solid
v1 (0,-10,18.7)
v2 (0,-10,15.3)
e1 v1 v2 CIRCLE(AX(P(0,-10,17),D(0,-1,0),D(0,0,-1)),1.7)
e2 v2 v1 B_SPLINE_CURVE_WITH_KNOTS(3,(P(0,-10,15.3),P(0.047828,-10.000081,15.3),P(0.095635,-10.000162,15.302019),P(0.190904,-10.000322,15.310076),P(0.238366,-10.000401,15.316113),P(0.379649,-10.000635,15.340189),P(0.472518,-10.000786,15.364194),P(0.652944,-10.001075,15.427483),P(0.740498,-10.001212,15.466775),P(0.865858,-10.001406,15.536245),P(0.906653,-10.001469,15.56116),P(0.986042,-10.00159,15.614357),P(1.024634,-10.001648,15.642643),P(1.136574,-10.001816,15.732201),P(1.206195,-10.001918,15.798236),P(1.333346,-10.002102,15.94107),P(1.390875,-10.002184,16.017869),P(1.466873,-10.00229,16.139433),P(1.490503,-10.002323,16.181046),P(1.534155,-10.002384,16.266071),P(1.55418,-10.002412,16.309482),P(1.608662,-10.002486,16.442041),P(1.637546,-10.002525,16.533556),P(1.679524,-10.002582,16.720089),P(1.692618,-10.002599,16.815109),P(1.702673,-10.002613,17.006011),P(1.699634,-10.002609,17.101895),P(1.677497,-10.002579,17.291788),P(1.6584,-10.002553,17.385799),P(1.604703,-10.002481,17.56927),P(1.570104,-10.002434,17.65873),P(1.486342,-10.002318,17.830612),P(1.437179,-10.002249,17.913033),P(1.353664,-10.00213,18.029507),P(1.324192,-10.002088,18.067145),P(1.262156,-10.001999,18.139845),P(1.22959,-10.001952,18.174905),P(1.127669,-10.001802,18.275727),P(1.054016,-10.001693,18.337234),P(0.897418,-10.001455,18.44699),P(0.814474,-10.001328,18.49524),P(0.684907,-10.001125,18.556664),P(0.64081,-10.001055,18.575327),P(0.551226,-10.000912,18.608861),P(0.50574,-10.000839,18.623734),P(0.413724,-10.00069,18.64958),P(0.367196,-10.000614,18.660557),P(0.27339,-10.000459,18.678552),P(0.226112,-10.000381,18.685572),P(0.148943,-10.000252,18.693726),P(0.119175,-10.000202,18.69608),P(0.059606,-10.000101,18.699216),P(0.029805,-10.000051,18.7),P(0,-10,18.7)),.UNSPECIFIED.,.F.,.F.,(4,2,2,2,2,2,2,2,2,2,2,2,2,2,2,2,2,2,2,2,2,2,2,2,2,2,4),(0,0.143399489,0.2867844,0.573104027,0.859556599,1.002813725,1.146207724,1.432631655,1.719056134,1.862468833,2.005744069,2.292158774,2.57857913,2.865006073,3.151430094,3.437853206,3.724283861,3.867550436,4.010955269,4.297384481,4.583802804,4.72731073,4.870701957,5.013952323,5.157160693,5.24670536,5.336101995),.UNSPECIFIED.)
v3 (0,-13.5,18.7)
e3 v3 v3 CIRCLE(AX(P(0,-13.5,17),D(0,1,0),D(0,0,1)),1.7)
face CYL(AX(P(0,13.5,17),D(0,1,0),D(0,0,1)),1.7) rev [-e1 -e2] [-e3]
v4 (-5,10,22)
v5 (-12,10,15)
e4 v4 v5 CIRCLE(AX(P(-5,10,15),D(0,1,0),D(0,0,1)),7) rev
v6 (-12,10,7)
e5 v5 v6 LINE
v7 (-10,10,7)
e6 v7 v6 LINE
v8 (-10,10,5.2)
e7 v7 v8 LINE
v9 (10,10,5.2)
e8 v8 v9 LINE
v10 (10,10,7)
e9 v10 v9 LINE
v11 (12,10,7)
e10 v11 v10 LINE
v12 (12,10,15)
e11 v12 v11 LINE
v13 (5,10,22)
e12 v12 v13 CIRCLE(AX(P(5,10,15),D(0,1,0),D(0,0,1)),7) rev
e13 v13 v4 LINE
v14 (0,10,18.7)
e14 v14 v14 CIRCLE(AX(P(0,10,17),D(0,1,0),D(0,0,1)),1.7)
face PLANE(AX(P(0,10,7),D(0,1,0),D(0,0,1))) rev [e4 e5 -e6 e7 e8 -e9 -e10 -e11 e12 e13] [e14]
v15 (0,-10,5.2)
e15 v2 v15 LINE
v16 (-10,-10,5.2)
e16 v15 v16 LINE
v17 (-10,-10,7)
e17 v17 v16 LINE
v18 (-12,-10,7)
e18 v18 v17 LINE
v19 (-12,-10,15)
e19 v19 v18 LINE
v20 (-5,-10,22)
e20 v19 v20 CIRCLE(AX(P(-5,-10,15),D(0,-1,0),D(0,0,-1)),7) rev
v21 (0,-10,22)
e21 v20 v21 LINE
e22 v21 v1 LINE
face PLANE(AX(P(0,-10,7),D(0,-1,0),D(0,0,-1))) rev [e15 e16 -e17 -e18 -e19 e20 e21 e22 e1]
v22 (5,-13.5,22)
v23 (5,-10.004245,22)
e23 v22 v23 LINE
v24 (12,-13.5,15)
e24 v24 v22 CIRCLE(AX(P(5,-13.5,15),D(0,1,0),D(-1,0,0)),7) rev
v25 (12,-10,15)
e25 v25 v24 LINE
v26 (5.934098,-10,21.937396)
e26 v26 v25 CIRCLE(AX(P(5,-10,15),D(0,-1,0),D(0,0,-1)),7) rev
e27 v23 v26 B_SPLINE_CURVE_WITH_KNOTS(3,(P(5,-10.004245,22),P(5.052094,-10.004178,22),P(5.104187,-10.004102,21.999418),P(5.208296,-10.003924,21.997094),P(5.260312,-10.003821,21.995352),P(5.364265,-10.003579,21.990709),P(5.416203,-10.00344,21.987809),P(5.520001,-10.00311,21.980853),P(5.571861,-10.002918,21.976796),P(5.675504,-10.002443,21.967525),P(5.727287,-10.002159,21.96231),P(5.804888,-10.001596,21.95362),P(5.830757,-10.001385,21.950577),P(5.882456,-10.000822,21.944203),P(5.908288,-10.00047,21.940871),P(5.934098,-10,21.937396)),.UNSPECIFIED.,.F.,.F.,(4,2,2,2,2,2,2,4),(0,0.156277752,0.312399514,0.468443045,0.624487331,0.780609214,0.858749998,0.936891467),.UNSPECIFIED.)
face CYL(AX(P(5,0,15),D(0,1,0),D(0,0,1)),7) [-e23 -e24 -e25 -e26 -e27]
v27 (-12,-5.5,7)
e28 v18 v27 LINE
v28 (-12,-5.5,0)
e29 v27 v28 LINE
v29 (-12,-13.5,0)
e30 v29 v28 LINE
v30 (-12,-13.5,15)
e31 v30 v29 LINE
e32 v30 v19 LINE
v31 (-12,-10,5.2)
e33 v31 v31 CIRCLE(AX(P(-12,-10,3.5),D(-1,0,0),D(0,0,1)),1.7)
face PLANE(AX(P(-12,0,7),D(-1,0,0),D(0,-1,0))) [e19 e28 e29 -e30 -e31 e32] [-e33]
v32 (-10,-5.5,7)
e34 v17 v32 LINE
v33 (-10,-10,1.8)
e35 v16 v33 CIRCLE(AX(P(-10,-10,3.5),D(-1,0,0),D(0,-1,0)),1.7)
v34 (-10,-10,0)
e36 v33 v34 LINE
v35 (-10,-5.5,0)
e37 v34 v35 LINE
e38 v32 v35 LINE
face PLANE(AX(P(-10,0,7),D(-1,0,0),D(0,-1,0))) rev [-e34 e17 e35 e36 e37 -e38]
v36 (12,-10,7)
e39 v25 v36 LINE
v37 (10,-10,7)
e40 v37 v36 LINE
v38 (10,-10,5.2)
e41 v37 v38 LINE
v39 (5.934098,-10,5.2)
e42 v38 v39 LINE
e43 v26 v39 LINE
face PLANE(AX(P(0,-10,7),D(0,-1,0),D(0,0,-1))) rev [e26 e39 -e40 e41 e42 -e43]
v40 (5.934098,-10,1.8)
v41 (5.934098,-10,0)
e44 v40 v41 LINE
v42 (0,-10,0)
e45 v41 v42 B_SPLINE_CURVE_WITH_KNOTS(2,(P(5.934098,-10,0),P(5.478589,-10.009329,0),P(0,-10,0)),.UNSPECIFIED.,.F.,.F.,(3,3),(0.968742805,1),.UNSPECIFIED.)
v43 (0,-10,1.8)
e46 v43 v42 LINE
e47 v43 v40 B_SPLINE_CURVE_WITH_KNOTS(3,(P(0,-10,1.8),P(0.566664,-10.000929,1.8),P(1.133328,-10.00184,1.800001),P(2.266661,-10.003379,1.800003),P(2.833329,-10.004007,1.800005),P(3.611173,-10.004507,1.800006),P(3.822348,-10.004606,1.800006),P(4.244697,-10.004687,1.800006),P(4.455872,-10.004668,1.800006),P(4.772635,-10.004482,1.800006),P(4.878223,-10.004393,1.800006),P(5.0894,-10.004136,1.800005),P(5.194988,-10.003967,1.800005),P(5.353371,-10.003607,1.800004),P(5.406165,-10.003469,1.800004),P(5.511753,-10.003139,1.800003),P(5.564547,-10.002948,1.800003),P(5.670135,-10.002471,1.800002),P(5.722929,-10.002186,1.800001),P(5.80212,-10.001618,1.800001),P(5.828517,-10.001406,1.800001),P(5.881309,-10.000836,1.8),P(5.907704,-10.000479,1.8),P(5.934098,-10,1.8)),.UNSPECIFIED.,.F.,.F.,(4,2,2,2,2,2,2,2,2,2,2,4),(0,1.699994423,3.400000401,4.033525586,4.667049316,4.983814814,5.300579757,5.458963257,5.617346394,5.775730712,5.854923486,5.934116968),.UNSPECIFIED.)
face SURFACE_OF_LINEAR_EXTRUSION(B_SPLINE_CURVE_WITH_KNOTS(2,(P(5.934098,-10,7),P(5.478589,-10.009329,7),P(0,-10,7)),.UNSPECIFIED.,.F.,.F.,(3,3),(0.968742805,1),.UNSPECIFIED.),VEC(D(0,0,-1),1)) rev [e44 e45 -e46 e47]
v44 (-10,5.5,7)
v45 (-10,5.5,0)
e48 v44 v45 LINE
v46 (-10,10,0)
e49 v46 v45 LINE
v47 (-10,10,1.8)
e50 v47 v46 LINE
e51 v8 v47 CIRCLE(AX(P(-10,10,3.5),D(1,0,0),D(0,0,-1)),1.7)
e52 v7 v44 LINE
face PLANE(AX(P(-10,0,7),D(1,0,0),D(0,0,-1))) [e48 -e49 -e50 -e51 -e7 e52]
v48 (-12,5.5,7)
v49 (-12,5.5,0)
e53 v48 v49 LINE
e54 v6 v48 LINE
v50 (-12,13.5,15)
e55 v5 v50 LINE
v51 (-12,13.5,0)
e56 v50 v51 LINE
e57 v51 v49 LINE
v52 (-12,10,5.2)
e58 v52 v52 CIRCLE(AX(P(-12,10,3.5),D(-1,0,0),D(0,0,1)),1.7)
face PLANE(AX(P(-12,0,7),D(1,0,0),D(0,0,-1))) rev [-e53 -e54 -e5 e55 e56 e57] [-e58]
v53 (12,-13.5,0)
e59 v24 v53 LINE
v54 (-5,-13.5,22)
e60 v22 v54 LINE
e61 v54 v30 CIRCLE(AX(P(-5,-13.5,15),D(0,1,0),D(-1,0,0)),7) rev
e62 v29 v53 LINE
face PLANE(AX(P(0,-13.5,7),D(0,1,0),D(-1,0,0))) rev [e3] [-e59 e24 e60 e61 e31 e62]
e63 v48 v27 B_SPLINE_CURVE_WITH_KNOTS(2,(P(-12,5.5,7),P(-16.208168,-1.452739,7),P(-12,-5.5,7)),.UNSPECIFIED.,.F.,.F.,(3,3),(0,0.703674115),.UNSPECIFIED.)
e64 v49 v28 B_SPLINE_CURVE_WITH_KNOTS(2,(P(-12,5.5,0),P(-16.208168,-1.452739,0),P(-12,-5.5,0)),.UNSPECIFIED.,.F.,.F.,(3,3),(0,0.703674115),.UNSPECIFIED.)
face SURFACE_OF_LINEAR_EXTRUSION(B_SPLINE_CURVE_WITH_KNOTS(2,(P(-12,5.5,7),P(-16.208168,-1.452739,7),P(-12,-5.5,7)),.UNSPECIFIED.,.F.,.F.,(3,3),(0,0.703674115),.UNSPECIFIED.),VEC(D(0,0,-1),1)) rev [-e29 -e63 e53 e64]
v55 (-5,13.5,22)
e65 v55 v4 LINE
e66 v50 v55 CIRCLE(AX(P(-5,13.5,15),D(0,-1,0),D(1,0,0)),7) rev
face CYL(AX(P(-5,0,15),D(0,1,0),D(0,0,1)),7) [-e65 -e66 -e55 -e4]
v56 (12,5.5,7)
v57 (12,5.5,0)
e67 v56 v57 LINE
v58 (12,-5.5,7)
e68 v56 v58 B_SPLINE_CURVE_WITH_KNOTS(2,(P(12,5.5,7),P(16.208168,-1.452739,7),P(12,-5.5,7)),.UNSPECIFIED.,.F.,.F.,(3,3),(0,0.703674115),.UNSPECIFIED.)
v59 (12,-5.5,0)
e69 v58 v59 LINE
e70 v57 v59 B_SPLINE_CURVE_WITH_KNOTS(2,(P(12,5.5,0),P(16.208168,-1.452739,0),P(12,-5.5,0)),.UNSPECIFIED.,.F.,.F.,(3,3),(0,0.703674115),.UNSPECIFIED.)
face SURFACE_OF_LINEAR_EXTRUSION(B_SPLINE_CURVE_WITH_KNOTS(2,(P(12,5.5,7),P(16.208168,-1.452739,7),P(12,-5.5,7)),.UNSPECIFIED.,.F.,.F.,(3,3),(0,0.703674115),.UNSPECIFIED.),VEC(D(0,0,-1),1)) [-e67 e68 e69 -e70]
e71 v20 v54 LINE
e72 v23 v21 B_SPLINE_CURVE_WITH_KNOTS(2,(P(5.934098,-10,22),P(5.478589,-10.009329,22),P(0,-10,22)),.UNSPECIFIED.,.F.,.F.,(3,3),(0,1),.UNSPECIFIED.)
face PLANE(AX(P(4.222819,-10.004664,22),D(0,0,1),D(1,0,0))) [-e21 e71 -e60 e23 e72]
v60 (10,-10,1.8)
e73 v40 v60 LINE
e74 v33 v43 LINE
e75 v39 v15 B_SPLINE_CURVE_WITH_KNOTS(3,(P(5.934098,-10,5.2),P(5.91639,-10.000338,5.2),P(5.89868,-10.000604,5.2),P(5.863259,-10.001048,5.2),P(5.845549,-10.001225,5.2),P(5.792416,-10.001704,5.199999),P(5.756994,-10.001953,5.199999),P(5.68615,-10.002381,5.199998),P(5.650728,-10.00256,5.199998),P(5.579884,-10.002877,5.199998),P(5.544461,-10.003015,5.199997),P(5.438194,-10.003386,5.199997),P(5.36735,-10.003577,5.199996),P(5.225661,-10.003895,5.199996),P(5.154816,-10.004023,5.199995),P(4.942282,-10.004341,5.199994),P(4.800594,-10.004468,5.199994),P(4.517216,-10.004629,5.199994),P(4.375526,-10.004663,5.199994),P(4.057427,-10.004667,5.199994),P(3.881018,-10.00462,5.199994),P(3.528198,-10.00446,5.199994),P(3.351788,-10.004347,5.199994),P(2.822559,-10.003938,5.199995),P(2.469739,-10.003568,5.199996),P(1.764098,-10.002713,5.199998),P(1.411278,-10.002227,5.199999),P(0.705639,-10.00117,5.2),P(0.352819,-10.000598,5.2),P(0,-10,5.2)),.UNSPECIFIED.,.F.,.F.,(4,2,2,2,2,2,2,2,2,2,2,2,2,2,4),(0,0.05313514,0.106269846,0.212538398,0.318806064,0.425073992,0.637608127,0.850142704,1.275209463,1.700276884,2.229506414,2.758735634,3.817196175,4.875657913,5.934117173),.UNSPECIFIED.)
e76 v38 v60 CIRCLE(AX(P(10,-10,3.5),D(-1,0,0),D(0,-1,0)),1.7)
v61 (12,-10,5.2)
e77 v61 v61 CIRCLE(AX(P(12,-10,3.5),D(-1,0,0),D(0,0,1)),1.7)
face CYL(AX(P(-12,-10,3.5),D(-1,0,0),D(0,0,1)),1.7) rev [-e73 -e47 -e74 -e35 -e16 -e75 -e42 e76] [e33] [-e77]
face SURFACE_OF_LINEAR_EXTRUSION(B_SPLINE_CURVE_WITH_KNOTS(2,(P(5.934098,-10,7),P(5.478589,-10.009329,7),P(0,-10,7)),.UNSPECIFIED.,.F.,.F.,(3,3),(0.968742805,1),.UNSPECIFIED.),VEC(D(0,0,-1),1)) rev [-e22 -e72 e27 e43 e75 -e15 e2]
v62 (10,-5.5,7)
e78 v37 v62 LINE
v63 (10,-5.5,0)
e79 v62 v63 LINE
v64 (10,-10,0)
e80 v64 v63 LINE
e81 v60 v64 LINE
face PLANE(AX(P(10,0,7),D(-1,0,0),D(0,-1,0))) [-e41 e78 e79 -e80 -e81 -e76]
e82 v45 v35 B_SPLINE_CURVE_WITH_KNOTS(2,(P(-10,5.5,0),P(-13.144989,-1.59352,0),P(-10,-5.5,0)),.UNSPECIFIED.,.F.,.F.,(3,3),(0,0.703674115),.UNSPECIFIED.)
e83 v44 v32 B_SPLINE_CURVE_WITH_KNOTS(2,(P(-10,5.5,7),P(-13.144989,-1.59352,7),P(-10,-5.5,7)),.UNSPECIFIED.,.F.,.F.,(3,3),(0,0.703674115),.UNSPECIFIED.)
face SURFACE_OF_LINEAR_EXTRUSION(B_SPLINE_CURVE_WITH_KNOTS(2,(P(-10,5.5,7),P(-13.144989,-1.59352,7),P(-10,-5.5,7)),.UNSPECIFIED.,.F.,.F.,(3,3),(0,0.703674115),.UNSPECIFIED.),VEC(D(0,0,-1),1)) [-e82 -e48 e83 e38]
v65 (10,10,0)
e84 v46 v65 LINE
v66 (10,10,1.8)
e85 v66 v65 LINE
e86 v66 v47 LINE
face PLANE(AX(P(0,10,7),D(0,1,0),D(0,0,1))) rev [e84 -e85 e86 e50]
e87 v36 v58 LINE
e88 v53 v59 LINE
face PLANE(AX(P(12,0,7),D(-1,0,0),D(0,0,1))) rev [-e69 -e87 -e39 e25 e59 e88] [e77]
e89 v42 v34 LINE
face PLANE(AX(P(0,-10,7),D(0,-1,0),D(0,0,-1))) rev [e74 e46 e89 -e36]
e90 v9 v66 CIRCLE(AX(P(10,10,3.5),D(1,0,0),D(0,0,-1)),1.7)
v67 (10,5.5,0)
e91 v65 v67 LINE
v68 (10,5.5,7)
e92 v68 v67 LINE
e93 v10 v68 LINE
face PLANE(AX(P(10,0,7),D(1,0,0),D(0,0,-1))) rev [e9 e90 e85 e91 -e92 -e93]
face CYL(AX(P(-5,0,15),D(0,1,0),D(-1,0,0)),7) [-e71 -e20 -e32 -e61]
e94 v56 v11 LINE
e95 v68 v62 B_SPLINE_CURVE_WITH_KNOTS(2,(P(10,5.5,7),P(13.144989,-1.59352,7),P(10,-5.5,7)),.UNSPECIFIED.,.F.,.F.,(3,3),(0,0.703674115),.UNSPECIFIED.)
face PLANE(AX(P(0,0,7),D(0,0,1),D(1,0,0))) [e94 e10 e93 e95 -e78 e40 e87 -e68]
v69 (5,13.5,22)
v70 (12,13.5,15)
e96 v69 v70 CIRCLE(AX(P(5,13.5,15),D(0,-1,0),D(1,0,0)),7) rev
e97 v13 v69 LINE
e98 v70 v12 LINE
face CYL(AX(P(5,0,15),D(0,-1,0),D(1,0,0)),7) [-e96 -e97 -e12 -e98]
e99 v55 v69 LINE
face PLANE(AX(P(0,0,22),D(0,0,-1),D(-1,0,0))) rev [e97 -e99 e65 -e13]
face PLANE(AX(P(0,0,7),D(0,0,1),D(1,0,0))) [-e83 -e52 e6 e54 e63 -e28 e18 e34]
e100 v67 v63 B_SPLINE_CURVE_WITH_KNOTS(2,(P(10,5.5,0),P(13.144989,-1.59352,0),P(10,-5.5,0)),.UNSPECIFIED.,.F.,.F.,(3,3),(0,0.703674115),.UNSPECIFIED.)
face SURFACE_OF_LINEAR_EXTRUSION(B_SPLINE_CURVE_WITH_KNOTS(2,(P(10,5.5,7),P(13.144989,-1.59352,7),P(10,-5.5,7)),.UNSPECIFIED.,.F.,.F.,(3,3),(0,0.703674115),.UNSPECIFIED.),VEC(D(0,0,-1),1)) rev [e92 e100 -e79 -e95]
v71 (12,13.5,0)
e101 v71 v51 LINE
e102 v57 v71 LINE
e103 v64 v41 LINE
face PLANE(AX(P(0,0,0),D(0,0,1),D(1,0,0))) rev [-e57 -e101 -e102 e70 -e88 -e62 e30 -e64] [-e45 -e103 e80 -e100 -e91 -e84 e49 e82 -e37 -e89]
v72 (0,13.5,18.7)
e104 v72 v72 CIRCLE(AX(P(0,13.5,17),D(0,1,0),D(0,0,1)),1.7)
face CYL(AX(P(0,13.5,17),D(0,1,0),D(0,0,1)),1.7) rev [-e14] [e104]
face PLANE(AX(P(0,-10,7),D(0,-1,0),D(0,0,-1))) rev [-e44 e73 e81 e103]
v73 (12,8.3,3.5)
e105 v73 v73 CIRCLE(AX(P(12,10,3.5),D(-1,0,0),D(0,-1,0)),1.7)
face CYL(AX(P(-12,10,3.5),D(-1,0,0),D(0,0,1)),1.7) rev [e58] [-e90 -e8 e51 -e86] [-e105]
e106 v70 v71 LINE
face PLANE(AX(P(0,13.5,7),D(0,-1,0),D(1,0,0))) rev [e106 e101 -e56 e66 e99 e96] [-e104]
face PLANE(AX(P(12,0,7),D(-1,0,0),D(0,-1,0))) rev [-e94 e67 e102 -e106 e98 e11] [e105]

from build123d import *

# Parameters (mm, degrees)
SKETCH1_W               = 24
SKETCH1_H               = 3.5
BOSS_EXTRUDE1_DEPTH     = 7
BOSS_EXTRUDE2_START     = 7
BOSS_EXTRUDE2_OUTLINE_W = 24
BOSS_EXTRUDE2_OUTLINE_H = 3.5
BOSS_EXTRUDE2_DEPTH     = 15
FILLET1_R               = 7
M3_CLEARANCE_HOLE1_D    = 3.4
M3_CLEARANCE_HOLE2_D    = 3.4


# Read off the part's stored shape, not the designer's step: Boss-Extrude2
with BuildPart() as part:
    # Sketch1 → Boss-Extrude1 (new body)
    with BuildSketch(Plane.XY):
        with Locations((0, 11.75)):
            Rectangle(SKETCH1_W, SKETCH1_H)
        with BuildLine():
            Line((-10, 10), (-12, 10))
            Line((-12, 10), (-12, 5.5))
            add(Edge.make_bspline(
                [(-12, 5.5), (-16.208168435, -1.452739177), (-12, -5.5)],
                knots=[0, 0, 0, 0.703674115, 0.703674115, 0.703674115], degree=2))
            Line((-12, -5.5), (-12, -10))
            Line((-12, -10), (-10, -10))
            Line((-10, -10), (-10, -5.5))
            add(Edge.make_bspline(
                [(-10, 5.5), (-13.144989471, -1.593519523), (-10, -5.5)],
                knots=[0, 0, 0, 0.703674115, 0.703674115, 0.703674115], degree=2))
            Line((-10, 5.5), (-10, 10))
        make_face()
        with BuildLine():
            Line((12, 5.5), (12, 10))
            Line((12, 10), (10, 10))
            Line((10, 10), (10, 5.5))
            add(Edge.make_bspline(
                [(10, 5.5), (13.144989471, -1.593519523), (10, -5.5)],
                knots=[0, 0, 0, 0.703674115, 0.703674115, 0.703674115], degree=2))
            Line((10, -5.5), (10, -10))
            Line((10, -10), (12, -10))
            Line((12, -10), (12, -5.5))
            add(Edge.make_bspline(
                [(12, 5.5), (16.208168435, -1.452739177), (12, -5.5)],
                knots=[0, 0, 0, 0.703674115, 0.703674115, 0.703674115], degree=2))
        make_face()
        with BuildLine():
            Line((-10, -10), (-12, -10))
            Line((-12, -10), (-12, -13.5))
            Line((-12, -13.5), (12, -13.5))
            Line((12, -13.5), (12, -10))
            Line((12, -10), (10, -10))
            Line((10, -10), (5.934098246, -10))
            add(Edge.make_bspline(
                [(5.934098246, -10), (5.478588927, -10.00932896), (0, -10)],
                knots=[0.968742805, 0.968742805, 0.968742805, 1, 1, 1], degree=2))
            Line((0, -10), (-10, -10))
        make_face()
    extrude(amount=BOSS_EXTRUDE1_DEPTH)

    # Boss-Extrude2 outline → Boss-Extrude2 (add)
    with BuildSketch(Plane.XY.offset(BOSS_EXTRUDE2_START)):
        with BuildLine():
            Line((12, -10), (5.934098246, -10))
            add(Edge.make_bspline(
                [(5.934098246, -10), (5.478588927, -10.00932896), (0, -10)],
                knots=[0.968742805, 0.968742805, 0.968742805, 1, 1, 1], degree=2))
            Line((0, -10), (-12, -10))
            Line((-12, -10), (-12, -13.5))
            Line((-12, -13.5), (12, -13.5))
            Line((12, -13.5), (12, -10))
        make_face()
        with Locations((0, 11.75)):
            Rectangle(BOSS_EXTRUDE2_OUTLINE_W, BOSS_EXTRUDE2_OUTLINE_H)
    extrude(amount=BOSS_EXTRUDE2_DEPTH)

    # Fillet1
    fillet1_edges = [part.edges().sort_by_distance(p)[0] for p in [
        (12, -11.75, 22),
        (-12, -11.75, 22),
        (12, 11.75, 22),
        (-12, 11.75, 22),
    ]]
    fillet(fillet1_edges, radius=FILLET1_R)

    # M3 Clearance Hole1 (through all)
    with Locations(Plane.ZY.offset(12)):
        with Locations((3.5, 10), (3.5, -10)):
            Hole(M3_CLEARANCE_HOLE1_D / 2)

    # M3 Clearance Hole2 (through all)
    with Locations(Plane(origin=(0, 13.5, 0), x_dir=(1, 0, 0), z_dir=(0, 1, 0))):
        with Locations((0, -17)):
            Hole(M3_CLEARANCE_HOLE2_D / 2)


solid = part.part
